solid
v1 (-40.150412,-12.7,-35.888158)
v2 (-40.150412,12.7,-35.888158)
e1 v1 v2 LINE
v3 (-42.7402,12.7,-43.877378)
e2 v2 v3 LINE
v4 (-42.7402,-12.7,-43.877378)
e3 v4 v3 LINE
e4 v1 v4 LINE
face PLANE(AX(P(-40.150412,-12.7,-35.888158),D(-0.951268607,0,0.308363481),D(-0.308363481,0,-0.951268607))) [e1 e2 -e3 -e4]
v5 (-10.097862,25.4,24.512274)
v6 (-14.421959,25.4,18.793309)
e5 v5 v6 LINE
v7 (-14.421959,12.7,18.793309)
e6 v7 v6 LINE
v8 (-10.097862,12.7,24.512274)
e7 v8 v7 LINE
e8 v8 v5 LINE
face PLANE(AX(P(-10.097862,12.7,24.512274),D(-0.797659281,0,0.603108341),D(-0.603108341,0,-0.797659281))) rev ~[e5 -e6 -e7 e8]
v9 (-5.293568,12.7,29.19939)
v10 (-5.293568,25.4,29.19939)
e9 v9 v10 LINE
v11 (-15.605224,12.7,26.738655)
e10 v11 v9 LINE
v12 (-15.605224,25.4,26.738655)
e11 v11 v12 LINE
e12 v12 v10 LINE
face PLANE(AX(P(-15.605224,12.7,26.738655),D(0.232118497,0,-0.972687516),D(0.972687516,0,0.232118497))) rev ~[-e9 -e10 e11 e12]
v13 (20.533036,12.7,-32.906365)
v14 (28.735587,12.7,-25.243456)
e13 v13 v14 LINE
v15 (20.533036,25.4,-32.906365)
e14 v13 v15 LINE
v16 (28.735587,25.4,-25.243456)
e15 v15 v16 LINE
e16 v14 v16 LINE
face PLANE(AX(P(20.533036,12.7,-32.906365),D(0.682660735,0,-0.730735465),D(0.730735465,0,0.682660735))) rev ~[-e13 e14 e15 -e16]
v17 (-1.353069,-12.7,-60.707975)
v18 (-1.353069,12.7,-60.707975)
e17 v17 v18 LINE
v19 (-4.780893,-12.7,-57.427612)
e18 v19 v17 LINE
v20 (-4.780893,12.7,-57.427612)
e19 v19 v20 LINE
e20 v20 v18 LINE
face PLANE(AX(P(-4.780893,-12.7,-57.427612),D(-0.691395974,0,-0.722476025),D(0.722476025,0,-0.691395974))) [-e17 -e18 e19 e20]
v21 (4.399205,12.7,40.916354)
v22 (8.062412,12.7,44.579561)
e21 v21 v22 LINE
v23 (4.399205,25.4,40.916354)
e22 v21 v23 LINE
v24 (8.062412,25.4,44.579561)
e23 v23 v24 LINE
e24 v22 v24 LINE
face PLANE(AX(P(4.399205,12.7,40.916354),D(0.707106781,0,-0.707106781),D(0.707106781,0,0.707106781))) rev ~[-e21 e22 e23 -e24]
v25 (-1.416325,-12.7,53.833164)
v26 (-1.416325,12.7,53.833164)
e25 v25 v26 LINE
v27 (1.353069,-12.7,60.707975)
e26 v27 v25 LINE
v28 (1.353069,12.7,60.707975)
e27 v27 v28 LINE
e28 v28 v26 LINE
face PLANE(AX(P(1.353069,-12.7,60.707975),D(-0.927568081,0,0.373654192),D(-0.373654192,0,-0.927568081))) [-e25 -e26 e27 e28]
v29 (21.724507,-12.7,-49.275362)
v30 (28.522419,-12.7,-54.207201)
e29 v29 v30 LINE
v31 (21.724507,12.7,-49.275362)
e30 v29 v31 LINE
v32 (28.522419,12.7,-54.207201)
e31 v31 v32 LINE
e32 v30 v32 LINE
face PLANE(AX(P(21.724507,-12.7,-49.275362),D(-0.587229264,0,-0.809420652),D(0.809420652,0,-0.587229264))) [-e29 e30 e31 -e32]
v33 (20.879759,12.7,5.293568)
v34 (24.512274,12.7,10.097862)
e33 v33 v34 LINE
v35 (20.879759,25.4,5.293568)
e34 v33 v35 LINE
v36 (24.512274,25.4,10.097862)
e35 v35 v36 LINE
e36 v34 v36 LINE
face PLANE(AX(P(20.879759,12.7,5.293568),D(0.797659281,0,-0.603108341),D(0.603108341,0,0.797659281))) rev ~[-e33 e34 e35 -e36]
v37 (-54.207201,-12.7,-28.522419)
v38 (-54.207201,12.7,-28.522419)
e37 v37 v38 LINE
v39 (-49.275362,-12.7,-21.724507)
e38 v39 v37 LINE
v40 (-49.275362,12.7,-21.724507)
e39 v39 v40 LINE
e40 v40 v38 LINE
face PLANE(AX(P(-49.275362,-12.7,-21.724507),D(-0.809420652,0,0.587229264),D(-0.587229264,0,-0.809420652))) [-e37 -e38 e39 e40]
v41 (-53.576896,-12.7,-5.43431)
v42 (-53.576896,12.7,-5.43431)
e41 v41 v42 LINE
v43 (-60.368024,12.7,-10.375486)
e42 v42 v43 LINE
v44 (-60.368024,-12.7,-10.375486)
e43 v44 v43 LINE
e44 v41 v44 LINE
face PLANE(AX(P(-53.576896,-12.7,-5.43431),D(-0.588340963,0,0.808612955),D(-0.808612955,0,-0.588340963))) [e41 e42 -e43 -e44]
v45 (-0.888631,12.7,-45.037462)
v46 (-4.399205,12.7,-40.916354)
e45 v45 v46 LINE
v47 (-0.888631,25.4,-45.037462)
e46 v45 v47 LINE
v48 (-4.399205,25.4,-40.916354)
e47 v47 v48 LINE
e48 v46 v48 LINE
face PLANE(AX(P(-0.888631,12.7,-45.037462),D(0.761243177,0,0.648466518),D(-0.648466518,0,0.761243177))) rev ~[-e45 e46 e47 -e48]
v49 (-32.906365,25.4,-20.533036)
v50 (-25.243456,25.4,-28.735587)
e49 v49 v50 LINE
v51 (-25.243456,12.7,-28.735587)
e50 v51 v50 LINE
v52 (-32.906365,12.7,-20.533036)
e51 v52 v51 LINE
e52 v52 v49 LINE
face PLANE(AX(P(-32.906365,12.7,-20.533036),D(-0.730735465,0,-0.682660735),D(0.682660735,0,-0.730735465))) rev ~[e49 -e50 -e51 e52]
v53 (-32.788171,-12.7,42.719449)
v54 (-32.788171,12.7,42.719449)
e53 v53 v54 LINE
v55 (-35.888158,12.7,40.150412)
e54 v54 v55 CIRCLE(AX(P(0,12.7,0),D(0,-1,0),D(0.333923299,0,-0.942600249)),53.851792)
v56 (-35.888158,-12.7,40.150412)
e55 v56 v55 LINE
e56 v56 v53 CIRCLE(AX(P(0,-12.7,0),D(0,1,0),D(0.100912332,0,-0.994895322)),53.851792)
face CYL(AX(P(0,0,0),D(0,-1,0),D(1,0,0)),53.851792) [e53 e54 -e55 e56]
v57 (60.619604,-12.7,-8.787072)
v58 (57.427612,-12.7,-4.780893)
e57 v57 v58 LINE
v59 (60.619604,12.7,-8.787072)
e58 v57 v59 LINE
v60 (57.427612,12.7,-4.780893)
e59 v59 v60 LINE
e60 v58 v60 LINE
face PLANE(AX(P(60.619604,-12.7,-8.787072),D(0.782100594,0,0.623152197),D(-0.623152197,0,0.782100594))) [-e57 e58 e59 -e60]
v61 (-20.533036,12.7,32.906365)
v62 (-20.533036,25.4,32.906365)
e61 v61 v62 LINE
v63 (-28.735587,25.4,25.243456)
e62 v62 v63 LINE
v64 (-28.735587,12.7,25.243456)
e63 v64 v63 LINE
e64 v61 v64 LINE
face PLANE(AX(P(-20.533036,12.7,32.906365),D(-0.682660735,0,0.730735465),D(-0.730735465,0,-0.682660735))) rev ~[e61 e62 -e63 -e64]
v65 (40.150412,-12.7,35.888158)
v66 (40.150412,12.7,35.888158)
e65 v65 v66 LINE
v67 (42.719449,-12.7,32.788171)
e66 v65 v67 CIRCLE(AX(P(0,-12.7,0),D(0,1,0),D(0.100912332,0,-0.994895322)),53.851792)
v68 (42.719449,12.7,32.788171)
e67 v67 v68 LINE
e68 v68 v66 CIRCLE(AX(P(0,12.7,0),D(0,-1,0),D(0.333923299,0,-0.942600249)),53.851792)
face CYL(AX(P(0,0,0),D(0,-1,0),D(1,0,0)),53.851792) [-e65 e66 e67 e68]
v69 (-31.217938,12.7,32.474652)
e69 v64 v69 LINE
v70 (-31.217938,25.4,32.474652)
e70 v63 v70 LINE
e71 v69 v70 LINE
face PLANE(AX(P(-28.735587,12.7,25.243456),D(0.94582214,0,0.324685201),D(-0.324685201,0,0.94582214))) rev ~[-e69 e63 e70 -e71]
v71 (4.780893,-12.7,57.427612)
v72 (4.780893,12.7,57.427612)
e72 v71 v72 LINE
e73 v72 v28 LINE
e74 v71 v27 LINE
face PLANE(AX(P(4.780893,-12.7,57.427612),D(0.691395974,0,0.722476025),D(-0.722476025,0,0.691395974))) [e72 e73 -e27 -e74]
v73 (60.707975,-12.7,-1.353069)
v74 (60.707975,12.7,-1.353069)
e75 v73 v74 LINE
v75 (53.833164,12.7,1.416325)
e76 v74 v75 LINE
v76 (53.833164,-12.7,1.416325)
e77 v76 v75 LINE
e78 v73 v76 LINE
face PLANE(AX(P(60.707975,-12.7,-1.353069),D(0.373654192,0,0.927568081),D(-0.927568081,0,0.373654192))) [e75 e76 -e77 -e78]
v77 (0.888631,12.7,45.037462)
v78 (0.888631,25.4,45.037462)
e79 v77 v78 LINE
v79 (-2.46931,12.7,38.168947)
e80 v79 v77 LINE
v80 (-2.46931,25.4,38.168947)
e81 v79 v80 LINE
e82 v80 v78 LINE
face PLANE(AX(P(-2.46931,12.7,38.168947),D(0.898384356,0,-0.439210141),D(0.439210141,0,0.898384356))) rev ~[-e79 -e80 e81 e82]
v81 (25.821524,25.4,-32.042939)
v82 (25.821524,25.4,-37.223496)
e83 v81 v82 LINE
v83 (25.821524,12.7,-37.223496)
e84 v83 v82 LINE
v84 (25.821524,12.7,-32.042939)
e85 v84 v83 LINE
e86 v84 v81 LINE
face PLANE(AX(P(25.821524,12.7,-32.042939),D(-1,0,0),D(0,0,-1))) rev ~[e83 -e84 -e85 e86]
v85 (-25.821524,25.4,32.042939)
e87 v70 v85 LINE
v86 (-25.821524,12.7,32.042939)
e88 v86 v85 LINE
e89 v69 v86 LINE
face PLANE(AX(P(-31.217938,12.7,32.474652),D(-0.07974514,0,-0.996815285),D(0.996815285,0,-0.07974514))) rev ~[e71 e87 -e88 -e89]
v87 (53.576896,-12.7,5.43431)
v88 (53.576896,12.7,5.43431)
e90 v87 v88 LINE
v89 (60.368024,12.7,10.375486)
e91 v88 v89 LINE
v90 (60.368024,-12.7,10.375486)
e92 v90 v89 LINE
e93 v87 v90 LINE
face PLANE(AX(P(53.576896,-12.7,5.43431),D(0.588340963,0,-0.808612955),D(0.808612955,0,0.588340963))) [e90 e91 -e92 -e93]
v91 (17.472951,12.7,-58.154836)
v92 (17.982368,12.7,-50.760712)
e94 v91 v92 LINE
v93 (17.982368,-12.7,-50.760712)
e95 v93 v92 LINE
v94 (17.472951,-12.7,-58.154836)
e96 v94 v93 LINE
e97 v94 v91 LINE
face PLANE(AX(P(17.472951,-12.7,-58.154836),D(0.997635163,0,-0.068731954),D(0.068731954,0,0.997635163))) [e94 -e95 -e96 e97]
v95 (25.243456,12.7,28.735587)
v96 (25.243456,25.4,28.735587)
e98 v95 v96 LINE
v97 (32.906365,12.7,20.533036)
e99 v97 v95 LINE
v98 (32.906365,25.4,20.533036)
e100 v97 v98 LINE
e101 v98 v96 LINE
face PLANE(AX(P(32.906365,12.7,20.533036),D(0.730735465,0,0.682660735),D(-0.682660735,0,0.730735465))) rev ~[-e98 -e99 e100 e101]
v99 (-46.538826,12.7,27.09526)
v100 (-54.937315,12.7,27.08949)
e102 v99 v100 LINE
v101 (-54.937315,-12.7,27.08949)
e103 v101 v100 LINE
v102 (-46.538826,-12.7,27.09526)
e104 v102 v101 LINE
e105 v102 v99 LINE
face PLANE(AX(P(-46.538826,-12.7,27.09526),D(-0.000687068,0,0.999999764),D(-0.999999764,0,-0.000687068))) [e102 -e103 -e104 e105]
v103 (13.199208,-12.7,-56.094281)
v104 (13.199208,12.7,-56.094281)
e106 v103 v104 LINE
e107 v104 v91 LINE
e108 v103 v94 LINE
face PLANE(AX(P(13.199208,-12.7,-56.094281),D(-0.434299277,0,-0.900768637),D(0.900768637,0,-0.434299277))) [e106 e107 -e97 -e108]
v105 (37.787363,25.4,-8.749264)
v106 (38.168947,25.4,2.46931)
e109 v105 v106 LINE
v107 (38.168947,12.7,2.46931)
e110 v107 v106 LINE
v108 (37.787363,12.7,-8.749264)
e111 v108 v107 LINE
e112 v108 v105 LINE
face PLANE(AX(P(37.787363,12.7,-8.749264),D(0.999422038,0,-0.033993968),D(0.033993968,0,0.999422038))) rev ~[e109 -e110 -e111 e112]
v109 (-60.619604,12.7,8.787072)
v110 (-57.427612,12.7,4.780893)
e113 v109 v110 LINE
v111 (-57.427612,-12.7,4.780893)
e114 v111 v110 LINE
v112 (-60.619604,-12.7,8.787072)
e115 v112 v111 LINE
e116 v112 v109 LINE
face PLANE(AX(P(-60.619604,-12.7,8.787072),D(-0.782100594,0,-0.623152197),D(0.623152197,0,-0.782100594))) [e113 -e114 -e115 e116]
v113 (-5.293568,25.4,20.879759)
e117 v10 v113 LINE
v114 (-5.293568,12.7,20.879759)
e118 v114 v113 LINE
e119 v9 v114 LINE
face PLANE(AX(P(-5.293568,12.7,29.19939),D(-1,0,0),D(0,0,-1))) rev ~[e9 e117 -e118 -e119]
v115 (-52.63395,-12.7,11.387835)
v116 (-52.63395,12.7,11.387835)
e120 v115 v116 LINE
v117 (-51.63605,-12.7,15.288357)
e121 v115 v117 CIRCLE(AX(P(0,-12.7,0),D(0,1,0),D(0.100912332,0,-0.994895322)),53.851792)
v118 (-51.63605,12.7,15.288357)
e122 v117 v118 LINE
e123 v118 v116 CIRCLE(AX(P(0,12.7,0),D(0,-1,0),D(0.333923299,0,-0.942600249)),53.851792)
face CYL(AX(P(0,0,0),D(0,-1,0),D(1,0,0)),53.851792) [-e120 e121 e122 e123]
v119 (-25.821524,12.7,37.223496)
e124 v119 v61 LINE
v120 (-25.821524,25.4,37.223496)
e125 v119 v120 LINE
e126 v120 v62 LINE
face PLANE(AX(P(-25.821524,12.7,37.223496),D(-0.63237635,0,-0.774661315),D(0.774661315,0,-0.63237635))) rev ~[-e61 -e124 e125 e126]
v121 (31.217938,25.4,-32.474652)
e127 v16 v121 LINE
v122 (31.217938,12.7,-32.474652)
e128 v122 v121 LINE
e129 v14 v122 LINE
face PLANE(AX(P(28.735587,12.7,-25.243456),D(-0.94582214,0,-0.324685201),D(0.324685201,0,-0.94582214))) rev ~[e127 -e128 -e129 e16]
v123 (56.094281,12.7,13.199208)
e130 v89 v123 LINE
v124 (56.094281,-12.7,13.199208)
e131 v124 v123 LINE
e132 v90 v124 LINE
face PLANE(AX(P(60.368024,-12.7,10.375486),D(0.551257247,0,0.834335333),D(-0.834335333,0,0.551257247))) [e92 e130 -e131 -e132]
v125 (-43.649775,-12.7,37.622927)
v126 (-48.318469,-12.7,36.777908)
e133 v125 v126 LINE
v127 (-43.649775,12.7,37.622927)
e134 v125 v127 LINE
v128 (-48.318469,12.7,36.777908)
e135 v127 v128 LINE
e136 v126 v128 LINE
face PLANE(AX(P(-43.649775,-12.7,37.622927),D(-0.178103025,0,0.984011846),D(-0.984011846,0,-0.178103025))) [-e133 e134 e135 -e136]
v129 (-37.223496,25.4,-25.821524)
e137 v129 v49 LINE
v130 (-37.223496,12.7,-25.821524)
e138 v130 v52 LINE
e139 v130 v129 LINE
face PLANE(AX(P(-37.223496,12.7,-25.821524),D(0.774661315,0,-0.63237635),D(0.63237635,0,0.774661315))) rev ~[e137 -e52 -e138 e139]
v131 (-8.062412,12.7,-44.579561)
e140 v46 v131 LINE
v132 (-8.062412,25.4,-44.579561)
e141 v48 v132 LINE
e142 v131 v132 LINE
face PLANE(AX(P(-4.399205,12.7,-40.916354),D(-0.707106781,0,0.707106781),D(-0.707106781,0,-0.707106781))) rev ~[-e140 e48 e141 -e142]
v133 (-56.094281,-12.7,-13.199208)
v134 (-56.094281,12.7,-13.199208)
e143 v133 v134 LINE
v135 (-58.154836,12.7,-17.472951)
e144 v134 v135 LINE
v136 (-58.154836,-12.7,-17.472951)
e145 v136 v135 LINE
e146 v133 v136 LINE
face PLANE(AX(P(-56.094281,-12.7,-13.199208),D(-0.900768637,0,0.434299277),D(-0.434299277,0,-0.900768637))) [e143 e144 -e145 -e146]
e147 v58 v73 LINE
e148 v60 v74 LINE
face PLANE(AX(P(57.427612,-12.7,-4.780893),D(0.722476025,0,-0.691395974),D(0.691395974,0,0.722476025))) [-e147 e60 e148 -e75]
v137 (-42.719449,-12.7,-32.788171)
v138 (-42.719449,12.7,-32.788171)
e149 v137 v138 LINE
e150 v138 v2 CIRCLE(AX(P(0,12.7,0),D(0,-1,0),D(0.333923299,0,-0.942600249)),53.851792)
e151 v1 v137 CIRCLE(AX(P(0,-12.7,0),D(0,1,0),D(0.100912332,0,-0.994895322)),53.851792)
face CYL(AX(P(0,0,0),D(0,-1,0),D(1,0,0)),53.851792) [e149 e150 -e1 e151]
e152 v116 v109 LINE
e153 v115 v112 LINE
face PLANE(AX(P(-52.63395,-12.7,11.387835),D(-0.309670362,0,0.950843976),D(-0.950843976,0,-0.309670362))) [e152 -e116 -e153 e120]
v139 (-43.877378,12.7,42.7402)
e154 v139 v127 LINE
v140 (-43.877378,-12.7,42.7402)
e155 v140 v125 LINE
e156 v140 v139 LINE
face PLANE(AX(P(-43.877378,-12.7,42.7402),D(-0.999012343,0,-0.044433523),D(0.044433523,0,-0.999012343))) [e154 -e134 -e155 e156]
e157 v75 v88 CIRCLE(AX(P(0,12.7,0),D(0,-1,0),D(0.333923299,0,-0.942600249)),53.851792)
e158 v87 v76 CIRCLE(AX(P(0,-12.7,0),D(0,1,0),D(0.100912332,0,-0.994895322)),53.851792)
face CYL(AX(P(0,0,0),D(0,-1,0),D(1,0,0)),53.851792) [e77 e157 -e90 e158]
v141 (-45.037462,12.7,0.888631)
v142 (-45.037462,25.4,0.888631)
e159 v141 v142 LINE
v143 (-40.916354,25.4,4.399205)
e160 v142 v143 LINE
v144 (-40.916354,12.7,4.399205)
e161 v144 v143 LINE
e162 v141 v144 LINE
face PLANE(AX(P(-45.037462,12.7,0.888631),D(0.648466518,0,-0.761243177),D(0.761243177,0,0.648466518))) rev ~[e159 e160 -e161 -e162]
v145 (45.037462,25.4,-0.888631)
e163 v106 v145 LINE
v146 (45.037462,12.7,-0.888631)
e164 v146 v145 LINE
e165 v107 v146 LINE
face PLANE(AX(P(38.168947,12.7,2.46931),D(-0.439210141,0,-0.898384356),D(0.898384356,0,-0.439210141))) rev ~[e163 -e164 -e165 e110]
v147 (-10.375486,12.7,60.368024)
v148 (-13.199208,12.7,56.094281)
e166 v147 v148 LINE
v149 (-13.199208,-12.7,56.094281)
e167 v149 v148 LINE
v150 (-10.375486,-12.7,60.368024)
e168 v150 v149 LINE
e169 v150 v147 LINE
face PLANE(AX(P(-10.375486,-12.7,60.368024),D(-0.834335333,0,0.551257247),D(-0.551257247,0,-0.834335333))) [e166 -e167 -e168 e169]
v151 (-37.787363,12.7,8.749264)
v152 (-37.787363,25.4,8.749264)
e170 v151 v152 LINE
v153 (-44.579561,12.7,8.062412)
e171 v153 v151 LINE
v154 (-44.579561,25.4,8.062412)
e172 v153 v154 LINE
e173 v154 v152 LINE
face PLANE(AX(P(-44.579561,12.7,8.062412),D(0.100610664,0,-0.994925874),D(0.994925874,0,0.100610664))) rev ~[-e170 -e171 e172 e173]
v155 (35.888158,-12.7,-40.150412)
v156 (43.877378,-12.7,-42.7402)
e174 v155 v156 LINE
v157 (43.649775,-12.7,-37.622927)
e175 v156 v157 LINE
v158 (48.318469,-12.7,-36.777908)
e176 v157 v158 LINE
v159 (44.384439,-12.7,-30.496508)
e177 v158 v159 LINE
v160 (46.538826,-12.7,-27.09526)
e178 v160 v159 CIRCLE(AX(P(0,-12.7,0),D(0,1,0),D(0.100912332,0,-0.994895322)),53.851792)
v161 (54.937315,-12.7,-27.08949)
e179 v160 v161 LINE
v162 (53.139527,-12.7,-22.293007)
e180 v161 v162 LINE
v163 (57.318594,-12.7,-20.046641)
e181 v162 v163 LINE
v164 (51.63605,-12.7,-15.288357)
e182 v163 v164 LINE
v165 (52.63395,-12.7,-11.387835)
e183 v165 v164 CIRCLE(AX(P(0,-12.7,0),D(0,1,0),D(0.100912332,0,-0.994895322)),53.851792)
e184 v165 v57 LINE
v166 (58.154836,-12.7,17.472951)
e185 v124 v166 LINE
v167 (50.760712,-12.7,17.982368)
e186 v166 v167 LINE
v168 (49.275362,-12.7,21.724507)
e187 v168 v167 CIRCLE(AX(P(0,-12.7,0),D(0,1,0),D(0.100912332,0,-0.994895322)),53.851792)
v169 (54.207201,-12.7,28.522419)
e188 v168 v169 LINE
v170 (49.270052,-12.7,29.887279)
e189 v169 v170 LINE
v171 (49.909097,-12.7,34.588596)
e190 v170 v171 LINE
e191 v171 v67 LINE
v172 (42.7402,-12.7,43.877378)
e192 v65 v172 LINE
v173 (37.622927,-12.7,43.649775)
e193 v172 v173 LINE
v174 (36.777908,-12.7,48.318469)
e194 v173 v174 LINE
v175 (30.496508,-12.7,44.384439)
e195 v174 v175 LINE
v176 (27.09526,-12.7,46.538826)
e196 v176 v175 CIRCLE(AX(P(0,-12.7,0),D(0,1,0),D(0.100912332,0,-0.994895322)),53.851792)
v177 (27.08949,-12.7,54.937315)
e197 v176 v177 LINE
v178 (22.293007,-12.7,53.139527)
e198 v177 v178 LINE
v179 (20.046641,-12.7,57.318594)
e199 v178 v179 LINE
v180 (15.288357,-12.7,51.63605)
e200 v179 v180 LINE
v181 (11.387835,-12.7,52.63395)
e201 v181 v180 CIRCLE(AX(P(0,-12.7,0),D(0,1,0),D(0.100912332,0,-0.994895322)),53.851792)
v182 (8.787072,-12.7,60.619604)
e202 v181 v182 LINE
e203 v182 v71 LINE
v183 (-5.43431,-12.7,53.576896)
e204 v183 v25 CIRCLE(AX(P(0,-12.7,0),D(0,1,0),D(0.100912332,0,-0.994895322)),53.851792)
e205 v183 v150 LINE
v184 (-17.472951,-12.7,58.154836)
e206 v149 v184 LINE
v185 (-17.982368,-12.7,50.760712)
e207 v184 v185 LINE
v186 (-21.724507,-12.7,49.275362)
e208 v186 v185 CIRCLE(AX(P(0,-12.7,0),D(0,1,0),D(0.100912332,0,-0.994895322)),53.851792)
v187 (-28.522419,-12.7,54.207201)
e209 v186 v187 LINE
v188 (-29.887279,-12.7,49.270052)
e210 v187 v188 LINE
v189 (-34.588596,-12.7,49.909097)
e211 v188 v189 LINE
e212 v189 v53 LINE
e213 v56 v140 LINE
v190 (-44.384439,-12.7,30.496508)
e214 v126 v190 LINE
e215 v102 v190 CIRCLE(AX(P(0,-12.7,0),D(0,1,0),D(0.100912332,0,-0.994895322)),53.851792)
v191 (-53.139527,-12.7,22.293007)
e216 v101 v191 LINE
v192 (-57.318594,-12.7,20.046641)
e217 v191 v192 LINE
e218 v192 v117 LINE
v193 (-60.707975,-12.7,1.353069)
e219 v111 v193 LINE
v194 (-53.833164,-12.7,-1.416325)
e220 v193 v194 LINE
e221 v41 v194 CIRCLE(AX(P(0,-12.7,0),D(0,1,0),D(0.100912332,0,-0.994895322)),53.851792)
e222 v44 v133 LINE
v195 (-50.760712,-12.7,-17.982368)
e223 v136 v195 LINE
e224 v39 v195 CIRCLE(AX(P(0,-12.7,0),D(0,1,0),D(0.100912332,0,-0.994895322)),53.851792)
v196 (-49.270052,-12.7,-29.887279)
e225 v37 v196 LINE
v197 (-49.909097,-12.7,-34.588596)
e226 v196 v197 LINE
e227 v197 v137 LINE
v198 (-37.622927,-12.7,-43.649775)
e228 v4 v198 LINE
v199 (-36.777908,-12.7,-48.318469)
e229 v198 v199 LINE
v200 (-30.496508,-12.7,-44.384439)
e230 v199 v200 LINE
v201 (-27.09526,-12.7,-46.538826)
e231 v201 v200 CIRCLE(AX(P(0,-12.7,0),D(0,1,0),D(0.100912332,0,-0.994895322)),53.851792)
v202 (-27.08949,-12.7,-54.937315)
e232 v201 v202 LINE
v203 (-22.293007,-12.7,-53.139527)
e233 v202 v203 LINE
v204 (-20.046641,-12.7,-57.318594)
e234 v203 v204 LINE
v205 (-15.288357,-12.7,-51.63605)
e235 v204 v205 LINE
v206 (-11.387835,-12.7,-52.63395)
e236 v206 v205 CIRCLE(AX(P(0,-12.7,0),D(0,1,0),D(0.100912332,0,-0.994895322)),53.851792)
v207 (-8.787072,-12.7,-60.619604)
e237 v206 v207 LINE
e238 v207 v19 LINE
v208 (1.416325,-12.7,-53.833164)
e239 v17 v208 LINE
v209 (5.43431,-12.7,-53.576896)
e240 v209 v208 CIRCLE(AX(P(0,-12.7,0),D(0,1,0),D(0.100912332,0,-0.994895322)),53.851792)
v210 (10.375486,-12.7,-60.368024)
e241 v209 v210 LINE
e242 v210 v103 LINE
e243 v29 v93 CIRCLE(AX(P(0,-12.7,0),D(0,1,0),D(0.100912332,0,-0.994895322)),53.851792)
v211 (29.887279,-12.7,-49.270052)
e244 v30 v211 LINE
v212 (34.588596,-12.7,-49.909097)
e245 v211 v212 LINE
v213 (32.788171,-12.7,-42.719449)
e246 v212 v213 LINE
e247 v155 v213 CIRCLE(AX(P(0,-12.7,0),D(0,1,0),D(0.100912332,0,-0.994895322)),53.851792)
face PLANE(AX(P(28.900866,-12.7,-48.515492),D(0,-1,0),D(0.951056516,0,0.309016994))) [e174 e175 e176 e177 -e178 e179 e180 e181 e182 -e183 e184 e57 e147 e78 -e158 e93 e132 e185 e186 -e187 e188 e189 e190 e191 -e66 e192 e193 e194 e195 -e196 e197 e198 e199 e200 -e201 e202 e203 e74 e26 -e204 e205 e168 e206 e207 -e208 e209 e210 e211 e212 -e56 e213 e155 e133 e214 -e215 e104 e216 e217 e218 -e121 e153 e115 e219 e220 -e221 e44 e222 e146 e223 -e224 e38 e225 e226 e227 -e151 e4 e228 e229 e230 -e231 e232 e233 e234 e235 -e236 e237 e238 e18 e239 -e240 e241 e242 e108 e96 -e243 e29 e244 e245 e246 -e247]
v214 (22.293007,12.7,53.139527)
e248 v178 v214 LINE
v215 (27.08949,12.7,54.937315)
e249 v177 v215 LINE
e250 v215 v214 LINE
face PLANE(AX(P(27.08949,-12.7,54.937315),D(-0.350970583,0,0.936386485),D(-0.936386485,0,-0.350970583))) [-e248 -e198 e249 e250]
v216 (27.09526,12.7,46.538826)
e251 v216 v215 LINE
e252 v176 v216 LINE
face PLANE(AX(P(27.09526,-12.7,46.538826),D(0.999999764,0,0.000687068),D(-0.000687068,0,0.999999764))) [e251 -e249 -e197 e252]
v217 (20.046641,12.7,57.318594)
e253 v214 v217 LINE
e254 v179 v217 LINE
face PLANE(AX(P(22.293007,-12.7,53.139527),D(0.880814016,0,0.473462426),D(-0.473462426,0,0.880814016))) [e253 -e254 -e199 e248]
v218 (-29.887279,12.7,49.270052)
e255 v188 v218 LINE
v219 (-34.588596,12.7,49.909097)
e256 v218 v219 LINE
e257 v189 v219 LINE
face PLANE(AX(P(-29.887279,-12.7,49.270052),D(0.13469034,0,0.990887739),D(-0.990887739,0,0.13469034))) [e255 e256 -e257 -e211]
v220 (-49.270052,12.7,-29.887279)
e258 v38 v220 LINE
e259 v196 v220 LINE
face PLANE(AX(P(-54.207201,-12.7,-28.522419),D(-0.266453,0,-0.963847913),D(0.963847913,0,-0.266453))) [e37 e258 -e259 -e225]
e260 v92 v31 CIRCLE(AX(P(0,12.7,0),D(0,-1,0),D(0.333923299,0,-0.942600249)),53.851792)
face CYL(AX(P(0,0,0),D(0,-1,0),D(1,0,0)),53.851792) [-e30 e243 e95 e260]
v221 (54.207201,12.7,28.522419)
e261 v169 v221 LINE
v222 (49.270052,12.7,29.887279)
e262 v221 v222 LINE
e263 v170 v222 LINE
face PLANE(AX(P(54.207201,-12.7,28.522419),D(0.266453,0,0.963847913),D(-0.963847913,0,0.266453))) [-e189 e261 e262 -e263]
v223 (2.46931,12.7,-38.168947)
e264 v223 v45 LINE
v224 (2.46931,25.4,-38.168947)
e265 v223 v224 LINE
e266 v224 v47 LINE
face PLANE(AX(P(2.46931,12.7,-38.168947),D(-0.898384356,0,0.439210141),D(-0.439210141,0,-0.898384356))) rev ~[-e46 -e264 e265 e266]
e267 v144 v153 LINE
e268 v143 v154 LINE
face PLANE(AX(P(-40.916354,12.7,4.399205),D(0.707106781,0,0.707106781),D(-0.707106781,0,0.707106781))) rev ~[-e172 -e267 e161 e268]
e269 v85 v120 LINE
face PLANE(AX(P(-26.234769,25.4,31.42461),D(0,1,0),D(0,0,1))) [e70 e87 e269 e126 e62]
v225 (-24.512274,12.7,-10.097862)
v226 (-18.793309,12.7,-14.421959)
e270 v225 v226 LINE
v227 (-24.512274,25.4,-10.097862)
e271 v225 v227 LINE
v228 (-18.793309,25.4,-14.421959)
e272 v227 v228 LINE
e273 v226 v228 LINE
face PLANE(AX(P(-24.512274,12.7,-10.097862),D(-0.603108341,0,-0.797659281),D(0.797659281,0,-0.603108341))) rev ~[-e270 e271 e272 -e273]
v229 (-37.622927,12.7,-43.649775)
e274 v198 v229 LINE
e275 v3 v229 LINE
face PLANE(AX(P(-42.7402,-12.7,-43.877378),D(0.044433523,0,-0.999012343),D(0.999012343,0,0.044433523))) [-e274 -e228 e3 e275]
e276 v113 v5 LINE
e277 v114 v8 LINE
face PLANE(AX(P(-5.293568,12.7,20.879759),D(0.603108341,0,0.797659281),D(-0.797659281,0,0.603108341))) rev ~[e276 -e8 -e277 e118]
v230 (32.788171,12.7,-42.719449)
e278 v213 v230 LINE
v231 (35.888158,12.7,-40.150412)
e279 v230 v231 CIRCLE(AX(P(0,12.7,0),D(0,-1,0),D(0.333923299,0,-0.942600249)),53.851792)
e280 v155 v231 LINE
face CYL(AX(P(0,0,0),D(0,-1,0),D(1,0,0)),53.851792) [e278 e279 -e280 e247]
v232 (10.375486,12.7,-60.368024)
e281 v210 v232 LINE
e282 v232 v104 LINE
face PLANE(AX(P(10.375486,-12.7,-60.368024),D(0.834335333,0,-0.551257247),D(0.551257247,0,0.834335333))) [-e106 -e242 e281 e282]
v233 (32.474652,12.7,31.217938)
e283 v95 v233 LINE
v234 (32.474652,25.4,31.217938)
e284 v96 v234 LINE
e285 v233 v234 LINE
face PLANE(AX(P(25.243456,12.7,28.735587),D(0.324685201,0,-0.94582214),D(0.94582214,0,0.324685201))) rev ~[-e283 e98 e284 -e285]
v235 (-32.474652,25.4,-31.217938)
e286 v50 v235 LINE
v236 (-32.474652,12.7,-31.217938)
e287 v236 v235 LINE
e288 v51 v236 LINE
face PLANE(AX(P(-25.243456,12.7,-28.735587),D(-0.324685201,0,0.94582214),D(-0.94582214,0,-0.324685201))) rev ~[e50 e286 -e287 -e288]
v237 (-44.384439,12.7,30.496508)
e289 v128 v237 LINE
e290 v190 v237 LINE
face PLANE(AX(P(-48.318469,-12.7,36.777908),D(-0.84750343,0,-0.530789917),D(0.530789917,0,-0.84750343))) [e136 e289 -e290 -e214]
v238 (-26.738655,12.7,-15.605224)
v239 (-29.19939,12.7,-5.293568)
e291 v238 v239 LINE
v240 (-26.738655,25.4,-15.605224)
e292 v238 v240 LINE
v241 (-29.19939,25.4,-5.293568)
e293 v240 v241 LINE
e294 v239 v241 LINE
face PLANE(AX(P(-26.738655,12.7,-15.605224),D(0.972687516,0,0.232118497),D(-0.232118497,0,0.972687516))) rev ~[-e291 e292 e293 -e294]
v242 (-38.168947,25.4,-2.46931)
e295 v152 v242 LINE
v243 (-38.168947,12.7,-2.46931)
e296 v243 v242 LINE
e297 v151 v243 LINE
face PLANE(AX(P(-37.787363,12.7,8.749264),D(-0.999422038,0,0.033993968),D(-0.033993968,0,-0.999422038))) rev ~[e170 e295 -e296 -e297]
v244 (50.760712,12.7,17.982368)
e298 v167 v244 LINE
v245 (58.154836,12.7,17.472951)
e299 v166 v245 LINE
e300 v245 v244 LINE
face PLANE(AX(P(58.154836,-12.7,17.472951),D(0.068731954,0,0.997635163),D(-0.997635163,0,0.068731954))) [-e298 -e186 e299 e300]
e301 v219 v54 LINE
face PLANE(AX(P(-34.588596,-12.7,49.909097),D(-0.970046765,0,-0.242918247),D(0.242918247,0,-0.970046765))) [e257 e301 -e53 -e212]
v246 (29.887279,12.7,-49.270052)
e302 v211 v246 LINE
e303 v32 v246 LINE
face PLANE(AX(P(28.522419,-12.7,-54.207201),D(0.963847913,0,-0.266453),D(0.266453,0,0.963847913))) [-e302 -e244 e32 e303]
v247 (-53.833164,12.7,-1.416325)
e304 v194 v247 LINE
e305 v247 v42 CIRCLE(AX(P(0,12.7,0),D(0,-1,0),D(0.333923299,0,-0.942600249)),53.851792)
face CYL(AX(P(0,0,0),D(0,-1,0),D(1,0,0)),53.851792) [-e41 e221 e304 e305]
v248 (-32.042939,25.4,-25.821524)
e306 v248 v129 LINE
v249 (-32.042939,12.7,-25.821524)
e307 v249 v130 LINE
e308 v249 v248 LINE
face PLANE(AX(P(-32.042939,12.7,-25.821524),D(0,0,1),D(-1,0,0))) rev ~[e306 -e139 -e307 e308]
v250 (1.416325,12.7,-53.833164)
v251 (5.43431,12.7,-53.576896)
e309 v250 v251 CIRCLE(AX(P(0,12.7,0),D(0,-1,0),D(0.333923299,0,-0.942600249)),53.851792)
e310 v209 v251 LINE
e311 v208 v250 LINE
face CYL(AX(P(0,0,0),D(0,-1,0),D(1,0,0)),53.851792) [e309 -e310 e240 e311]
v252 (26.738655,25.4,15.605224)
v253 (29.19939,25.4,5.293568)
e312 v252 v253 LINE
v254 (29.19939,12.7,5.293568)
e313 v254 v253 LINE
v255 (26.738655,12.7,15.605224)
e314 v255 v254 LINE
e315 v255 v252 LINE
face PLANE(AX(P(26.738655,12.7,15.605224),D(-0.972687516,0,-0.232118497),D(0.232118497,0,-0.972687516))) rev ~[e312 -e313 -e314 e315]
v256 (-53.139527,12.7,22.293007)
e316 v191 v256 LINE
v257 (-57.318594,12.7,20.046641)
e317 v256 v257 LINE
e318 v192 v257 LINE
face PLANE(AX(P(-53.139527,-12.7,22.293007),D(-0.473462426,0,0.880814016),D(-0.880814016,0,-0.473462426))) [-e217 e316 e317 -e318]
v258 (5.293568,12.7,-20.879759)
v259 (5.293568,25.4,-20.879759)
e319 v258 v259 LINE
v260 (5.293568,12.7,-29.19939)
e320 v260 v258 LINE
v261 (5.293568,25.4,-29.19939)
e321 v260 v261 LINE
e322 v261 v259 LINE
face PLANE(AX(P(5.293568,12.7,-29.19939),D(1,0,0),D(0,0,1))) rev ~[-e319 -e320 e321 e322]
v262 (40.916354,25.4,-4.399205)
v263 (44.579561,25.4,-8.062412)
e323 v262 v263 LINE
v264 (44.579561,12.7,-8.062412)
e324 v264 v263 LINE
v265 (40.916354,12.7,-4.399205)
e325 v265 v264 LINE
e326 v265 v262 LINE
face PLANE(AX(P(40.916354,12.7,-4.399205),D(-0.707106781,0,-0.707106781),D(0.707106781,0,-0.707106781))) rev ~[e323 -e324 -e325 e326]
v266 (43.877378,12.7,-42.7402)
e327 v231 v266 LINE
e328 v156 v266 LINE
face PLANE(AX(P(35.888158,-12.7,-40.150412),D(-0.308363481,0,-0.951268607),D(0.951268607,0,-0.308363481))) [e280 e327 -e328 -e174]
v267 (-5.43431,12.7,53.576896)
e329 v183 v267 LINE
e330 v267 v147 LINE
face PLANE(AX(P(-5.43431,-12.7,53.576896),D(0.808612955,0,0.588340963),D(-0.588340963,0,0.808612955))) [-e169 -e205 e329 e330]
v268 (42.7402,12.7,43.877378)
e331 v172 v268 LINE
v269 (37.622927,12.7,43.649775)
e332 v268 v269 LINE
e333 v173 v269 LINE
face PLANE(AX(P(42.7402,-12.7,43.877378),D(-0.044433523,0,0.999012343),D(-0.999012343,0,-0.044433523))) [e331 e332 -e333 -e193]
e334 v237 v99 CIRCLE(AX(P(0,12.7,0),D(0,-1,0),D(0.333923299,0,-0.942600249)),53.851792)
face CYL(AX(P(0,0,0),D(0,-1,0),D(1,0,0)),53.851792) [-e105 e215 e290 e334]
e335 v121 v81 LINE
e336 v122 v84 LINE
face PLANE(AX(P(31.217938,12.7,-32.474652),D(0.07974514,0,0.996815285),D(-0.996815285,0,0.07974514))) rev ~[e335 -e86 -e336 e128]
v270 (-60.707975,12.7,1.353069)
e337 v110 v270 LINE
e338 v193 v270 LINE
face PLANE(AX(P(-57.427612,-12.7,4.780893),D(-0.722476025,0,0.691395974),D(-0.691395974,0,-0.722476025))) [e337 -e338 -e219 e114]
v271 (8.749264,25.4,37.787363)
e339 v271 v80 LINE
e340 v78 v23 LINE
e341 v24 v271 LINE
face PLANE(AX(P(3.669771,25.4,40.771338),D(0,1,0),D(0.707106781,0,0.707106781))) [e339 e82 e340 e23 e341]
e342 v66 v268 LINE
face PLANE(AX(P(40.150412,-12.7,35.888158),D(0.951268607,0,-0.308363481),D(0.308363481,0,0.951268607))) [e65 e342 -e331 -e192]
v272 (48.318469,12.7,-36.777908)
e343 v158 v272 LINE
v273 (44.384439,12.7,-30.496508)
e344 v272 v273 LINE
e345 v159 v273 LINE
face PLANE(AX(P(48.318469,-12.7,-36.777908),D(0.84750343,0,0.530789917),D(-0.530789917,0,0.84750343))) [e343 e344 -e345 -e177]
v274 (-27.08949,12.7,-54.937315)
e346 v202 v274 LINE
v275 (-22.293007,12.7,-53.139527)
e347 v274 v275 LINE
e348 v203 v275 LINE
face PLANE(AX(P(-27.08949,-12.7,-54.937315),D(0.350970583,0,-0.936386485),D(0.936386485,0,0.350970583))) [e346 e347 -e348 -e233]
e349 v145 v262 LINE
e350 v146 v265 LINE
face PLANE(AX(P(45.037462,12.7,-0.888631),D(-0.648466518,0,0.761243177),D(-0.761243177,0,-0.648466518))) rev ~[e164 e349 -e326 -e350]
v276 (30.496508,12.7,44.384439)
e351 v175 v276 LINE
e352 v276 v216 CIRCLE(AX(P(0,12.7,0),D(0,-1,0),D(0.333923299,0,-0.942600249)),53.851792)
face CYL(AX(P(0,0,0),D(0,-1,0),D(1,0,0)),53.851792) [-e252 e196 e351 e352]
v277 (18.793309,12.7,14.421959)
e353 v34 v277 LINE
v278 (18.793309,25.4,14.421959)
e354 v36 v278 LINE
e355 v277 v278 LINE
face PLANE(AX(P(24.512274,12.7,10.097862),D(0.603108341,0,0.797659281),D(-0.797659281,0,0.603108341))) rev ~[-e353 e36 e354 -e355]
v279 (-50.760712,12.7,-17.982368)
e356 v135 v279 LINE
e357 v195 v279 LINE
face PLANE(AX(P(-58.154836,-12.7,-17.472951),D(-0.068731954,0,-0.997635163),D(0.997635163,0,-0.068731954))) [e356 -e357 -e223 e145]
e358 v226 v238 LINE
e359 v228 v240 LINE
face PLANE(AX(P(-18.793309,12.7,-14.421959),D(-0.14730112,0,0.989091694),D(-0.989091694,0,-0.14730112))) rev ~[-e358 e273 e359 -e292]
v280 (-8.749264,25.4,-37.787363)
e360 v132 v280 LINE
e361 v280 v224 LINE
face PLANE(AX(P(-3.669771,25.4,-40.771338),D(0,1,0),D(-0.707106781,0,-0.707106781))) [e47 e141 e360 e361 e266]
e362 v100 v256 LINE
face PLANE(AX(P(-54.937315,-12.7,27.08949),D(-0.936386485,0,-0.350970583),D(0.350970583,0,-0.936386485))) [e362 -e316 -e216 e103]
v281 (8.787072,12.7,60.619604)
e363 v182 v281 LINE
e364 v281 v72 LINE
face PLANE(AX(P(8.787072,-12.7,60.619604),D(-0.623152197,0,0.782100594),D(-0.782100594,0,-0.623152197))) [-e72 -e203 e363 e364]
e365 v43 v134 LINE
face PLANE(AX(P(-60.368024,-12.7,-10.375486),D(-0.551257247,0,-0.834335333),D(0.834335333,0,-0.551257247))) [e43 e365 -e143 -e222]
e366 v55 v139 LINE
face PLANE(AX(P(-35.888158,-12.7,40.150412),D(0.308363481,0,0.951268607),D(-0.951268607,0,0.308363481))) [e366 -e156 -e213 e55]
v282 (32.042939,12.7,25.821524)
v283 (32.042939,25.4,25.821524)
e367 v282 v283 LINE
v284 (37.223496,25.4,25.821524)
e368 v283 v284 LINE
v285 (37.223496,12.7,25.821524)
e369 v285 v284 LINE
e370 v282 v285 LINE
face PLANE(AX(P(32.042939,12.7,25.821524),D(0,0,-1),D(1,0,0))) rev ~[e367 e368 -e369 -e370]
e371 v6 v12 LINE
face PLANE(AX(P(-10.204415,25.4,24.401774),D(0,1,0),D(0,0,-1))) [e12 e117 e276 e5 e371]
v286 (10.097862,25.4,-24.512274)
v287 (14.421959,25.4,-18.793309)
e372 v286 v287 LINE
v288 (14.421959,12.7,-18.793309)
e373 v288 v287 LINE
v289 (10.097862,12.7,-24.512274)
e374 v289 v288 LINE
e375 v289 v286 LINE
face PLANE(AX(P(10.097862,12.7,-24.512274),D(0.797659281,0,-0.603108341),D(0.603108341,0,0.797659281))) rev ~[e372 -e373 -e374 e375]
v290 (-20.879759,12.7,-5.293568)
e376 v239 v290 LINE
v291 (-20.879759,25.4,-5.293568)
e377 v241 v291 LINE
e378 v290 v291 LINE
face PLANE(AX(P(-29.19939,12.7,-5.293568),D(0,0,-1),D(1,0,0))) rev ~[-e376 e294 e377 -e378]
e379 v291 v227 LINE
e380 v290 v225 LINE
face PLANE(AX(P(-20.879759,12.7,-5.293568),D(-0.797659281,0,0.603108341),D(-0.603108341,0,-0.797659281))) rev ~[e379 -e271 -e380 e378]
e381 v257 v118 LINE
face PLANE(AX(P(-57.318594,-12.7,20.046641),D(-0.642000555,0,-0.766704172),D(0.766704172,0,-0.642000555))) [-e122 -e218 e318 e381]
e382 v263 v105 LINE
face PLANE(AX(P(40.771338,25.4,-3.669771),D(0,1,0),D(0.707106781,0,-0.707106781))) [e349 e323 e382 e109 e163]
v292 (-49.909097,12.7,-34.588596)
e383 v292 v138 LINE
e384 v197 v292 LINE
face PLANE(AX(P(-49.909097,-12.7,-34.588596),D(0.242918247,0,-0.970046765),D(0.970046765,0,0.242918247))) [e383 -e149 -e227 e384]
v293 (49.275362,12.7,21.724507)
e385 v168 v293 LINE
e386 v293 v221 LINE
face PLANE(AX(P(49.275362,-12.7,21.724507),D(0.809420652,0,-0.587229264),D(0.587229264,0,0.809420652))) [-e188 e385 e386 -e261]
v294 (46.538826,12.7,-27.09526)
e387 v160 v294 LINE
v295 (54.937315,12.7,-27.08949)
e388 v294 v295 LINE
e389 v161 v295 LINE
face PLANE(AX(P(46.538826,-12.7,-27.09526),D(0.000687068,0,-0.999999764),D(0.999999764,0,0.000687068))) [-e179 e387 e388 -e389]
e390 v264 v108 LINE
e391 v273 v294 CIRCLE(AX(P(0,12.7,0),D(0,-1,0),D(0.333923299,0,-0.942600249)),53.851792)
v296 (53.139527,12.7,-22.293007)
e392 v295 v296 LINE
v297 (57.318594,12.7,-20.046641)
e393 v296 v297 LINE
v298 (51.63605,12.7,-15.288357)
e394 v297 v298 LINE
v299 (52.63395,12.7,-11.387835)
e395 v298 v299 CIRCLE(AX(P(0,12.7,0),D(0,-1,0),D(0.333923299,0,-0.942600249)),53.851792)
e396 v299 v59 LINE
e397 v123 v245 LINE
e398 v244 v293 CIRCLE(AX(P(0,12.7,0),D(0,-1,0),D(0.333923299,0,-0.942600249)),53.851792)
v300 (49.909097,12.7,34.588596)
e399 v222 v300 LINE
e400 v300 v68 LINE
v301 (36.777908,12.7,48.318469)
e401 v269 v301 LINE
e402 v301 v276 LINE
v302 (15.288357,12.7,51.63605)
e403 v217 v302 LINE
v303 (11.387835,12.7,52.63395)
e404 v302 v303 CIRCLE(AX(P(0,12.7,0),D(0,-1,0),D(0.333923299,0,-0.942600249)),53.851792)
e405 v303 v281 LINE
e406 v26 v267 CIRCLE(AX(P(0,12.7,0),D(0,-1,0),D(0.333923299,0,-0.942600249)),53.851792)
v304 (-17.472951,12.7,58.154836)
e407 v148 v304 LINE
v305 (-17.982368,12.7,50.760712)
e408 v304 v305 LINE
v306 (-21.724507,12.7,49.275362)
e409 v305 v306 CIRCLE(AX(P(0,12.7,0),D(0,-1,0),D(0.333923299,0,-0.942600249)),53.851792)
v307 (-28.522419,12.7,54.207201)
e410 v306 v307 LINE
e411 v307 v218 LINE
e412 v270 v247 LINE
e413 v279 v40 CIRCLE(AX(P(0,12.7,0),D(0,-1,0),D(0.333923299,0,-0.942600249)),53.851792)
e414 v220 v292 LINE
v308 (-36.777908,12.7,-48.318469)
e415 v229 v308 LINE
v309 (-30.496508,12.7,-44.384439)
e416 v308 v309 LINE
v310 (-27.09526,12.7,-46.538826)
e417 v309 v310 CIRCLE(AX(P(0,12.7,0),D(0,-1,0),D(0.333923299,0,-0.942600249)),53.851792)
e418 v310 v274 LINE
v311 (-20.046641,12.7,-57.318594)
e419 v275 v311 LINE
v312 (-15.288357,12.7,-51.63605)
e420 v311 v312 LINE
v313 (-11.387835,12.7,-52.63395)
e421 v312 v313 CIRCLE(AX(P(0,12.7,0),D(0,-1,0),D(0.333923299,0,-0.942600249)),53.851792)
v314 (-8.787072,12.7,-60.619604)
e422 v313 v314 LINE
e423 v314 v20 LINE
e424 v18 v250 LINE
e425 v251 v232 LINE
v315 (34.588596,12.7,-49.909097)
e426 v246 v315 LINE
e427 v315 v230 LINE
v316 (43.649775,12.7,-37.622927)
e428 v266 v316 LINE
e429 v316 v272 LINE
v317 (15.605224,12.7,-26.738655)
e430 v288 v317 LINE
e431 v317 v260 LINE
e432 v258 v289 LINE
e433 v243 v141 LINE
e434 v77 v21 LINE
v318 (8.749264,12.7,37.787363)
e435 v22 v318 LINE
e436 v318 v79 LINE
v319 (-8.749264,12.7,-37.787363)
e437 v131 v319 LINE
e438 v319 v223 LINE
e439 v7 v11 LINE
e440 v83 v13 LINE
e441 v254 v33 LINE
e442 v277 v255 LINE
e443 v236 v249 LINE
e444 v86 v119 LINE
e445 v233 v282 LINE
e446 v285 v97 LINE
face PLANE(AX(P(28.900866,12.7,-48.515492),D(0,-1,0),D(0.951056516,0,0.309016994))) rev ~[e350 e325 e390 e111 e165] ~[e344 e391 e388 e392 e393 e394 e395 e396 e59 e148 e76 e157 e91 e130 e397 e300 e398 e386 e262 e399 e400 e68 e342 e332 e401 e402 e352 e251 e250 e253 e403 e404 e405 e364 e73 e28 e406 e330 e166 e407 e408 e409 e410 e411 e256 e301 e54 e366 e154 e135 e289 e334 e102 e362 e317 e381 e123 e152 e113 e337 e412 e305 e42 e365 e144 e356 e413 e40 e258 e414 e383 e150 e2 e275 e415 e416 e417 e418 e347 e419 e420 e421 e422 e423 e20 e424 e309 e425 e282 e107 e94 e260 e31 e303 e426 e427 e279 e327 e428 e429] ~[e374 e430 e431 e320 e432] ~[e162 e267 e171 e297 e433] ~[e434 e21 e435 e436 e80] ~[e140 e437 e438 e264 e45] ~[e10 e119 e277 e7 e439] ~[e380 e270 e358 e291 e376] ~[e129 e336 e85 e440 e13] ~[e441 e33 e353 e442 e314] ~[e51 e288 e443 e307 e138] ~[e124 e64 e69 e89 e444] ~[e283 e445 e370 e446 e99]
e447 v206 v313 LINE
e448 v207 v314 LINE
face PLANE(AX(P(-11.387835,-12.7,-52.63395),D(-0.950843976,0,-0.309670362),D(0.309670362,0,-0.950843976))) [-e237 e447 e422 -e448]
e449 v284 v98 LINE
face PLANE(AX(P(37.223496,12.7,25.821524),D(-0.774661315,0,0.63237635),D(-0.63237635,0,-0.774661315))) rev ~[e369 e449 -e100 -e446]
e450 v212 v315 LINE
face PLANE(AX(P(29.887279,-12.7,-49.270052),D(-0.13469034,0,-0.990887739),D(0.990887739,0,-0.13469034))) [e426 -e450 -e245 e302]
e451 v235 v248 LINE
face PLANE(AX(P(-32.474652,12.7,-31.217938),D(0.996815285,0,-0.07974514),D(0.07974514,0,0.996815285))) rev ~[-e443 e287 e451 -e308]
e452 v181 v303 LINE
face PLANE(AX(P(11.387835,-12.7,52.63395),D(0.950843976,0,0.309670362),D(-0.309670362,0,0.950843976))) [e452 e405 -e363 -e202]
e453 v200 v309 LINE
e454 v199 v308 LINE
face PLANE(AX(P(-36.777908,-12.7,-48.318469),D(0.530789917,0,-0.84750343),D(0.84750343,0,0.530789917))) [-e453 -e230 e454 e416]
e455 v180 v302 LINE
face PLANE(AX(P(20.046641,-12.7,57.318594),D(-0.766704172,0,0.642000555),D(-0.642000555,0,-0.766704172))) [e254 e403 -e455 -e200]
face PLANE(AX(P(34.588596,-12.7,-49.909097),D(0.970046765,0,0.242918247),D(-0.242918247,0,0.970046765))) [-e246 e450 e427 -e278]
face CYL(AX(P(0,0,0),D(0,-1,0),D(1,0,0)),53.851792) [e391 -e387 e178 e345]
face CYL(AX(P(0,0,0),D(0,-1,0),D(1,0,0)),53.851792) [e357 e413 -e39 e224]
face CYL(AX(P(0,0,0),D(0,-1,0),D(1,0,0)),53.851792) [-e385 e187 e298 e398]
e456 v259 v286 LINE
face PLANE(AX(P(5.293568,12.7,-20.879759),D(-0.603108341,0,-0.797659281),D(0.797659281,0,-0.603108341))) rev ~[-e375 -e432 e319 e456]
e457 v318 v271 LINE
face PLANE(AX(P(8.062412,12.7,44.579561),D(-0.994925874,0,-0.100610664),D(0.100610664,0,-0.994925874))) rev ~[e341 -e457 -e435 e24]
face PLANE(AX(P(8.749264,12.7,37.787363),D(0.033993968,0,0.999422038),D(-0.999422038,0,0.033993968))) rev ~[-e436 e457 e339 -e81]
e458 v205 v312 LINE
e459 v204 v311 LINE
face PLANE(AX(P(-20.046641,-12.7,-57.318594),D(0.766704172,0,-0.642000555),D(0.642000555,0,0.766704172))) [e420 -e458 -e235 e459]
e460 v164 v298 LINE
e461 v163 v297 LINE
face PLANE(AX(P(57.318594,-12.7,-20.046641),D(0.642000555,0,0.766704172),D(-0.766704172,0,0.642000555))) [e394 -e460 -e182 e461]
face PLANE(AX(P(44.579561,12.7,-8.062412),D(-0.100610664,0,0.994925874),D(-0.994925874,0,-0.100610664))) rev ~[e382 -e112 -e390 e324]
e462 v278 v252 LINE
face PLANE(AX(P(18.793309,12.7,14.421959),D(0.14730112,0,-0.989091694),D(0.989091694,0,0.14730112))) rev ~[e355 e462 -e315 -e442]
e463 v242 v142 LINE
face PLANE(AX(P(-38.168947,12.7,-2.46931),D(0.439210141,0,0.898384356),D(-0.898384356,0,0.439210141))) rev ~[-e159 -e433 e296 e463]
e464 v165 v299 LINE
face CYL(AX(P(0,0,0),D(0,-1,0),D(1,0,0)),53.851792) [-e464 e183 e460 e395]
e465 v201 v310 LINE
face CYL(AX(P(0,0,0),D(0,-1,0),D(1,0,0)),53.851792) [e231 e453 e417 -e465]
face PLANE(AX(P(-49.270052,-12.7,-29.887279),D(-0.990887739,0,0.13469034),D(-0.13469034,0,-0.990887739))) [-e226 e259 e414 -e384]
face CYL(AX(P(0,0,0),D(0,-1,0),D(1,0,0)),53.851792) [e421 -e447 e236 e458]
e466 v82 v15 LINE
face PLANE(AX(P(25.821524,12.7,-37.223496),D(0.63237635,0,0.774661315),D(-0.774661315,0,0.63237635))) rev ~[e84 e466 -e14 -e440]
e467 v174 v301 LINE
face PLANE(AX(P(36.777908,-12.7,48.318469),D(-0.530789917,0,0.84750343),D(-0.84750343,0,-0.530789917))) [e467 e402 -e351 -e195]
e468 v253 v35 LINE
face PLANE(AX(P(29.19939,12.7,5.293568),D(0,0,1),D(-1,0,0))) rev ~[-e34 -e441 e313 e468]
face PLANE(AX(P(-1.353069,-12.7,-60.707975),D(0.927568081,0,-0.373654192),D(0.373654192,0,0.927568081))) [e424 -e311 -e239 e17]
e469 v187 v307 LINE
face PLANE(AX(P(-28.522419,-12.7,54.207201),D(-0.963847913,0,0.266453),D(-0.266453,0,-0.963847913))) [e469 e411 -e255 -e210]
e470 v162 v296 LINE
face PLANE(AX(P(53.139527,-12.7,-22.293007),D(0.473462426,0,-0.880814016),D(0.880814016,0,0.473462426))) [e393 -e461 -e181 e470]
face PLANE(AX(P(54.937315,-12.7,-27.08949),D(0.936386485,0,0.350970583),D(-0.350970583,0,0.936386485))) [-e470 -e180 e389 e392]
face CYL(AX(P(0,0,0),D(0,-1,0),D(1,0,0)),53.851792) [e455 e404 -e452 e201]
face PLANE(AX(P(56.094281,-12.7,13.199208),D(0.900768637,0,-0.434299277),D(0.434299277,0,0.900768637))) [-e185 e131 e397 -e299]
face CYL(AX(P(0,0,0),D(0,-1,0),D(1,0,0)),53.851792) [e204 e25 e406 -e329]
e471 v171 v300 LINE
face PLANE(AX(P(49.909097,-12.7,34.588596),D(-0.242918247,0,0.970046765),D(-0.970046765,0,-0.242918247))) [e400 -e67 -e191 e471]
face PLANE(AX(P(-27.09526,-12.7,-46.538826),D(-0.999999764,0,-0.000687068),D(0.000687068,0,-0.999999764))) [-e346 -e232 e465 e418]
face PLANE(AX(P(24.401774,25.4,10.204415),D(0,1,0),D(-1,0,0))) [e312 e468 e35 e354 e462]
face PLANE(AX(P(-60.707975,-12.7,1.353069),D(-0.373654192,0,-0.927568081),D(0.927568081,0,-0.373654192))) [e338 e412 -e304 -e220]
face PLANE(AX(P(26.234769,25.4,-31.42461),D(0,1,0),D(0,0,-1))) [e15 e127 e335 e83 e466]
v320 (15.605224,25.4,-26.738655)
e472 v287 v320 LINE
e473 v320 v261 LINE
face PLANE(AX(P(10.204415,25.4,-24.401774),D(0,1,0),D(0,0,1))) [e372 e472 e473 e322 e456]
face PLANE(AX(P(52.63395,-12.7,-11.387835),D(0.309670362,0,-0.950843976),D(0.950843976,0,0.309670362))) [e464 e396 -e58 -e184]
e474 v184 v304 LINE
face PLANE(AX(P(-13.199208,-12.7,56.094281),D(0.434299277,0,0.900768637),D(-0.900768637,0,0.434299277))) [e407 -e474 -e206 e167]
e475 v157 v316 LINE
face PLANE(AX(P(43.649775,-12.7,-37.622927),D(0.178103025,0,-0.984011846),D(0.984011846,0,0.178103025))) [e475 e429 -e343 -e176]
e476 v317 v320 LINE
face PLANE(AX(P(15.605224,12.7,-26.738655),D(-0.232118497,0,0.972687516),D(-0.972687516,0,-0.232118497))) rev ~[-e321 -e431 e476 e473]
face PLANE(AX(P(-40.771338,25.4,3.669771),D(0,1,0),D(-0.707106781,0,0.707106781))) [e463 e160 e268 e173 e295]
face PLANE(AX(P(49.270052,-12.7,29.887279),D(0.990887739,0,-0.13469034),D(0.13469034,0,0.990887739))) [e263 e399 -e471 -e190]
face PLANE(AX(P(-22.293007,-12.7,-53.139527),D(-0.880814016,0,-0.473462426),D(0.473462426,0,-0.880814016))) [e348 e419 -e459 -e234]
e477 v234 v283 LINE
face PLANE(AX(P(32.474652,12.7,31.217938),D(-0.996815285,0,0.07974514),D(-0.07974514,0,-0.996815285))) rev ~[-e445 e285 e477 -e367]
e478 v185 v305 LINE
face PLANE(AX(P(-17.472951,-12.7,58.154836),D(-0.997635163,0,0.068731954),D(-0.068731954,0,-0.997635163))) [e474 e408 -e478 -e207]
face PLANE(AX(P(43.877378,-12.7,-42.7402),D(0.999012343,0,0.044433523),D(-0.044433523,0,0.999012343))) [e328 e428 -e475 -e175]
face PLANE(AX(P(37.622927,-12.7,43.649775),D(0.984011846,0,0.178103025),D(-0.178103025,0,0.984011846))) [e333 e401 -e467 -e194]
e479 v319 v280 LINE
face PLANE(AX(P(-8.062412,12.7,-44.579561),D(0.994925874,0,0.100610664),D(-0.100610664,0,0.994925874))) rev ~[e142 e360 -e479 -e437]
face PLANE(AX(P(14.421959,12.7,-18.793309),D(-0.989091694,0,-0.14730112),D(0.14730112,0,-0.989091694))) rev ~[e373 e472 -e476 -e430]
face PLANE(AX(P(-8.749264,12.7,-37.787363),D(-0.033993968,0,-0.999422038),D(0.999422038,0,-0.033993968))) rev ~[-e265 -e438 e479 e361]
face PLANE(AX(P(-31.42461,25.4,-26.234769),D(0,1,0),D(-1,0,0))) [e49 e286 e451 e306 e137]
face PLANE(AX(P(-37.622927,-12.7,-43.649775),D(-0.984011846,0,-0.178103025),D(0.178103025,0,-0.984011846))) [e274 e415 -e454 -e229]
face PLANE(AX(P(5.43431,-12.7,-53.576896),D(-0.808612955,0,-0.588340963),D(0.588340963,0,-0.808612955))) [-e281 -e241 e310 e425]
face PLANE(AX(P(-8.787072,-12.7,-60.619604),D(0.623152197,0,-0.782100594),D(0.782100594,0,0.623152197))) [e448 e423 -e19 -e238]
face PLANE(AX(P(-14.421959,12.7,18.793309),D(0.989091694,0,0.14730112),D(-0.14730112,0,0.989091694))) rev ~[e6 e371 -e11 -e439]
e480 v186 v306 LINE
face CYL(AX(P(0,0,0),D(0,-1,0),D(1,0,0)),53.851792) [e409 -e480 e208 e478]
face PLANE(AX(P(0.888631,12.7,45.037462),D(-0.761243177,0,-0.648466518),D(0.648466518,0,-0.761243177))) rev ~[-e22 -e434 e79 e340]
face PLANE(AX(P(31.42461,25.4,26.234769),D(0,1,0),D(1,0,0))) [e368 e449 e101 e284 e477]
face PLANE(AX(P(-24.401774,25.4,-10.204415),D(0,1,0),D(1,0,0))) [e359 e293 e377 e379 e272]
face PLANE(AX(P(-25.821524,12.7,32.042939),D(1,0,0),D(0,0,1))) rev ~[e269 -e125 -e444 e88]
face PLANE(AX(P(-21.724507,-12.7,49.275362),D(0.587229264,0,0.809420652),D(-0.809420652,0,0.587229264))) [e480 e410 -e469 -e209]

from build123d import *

# Parameters (mm, degrees)
F0_R            = 53.8517918496
F1_DEPTH        = 12.7
F3_DEPTH        = 25.4
F3_COPIES_COUNT = 20
F5_DEPTH        = 12.7
F5_COPIES_COUNT = 8
F7_DEPTH        = 12.7
F7_COPIES_COUNT = 4


# Not quite as in the source:
# - a pattern or mirror of a feature is missing from the dataset's text; its kind, count and spacing are read off the source's solid


with BuildPart() as f1:
    # F0 (on Front) → F1 (new body, symmetric)
    with BuildSketch(Plane.XZ):
        Circle(F0_R)
    extrude(amount=F1_DEPTH, both=True)

    # F2 (on face) → F3 (join, through all)
    with BuildSketch(Plane.XZ.offset(12.7)):
        Polygon((17.4729507416, -58.154836297), (17.9823680134, -50.7607124264), (5.4343099044, -53.5768957786), (10.3754857555, -60.3680238128), (13.1992083043, -56.0942813754), align=None)
    f3 = extrude(amount=-F3_DEPTH)

    # F3_copies: F3 ×20 about axis
    f3_copies_axis = Axis((0, 0, 0), (0, 1, 0))
    for i in range(1, F3_COPIES_COUNT):
        add(f3.rotate(f3_copies_axis, i * 360 / F3_COPIES_COUNT))

    # F4 (on face) → F5 (join)
    with BuildSketch(Plane(origin=(0, 12.7, 0), x_dir=(-1, 0, 0), z_dir=(0, 1, 0))):
        Polygon((32.4746519327, -31.217938289), (32.0429392159, -25.8215237409), (37.223495543, -25.8215237409), (32.9063646495, -20.5330364406), (25.2434555441, -28.7355873734), align=None)
    f5 = extrude(amount=F5_DEPTH)

    # F5_copies: F5 ×8 about axis
    f5_copies_axis = Axis((0, 0, 0), (0, 1, 0))
    for i in range(1, F5_COPIES_COUNT):
        add(f5.rotate(f5_copies_axis, i * 360 / F5_COPIES_COUNT))

    # F6 (on face) → F7 (join)
    with BuildSketch(Plane(origin=(0, 12.7, 0), x_dir=(-1, 0, 0), z_dir=(0, 1, 0))):
        Polygon((-18.7933090678, 14.4219585457), (-26.7386548221, 15.6052242965), (-29.1993897408, 5.2935681306), (-20.8797585219, 5.2935681306), (-24.5122741908, 10.0978622213), align=None)
    f7 = extrude(amount=F7_DEPTH)

    # F7_copies: F7 ×4 about axis
    f7_copies_axis = Axis((0, 0, 0), (0, 1, 0))
    for i in range(1, F7_COPIES_COUNT):
        add(f7.rotate(f7_copies_axis, i * 360 / F7_COPIES_COUNT))


solid = f1.part
